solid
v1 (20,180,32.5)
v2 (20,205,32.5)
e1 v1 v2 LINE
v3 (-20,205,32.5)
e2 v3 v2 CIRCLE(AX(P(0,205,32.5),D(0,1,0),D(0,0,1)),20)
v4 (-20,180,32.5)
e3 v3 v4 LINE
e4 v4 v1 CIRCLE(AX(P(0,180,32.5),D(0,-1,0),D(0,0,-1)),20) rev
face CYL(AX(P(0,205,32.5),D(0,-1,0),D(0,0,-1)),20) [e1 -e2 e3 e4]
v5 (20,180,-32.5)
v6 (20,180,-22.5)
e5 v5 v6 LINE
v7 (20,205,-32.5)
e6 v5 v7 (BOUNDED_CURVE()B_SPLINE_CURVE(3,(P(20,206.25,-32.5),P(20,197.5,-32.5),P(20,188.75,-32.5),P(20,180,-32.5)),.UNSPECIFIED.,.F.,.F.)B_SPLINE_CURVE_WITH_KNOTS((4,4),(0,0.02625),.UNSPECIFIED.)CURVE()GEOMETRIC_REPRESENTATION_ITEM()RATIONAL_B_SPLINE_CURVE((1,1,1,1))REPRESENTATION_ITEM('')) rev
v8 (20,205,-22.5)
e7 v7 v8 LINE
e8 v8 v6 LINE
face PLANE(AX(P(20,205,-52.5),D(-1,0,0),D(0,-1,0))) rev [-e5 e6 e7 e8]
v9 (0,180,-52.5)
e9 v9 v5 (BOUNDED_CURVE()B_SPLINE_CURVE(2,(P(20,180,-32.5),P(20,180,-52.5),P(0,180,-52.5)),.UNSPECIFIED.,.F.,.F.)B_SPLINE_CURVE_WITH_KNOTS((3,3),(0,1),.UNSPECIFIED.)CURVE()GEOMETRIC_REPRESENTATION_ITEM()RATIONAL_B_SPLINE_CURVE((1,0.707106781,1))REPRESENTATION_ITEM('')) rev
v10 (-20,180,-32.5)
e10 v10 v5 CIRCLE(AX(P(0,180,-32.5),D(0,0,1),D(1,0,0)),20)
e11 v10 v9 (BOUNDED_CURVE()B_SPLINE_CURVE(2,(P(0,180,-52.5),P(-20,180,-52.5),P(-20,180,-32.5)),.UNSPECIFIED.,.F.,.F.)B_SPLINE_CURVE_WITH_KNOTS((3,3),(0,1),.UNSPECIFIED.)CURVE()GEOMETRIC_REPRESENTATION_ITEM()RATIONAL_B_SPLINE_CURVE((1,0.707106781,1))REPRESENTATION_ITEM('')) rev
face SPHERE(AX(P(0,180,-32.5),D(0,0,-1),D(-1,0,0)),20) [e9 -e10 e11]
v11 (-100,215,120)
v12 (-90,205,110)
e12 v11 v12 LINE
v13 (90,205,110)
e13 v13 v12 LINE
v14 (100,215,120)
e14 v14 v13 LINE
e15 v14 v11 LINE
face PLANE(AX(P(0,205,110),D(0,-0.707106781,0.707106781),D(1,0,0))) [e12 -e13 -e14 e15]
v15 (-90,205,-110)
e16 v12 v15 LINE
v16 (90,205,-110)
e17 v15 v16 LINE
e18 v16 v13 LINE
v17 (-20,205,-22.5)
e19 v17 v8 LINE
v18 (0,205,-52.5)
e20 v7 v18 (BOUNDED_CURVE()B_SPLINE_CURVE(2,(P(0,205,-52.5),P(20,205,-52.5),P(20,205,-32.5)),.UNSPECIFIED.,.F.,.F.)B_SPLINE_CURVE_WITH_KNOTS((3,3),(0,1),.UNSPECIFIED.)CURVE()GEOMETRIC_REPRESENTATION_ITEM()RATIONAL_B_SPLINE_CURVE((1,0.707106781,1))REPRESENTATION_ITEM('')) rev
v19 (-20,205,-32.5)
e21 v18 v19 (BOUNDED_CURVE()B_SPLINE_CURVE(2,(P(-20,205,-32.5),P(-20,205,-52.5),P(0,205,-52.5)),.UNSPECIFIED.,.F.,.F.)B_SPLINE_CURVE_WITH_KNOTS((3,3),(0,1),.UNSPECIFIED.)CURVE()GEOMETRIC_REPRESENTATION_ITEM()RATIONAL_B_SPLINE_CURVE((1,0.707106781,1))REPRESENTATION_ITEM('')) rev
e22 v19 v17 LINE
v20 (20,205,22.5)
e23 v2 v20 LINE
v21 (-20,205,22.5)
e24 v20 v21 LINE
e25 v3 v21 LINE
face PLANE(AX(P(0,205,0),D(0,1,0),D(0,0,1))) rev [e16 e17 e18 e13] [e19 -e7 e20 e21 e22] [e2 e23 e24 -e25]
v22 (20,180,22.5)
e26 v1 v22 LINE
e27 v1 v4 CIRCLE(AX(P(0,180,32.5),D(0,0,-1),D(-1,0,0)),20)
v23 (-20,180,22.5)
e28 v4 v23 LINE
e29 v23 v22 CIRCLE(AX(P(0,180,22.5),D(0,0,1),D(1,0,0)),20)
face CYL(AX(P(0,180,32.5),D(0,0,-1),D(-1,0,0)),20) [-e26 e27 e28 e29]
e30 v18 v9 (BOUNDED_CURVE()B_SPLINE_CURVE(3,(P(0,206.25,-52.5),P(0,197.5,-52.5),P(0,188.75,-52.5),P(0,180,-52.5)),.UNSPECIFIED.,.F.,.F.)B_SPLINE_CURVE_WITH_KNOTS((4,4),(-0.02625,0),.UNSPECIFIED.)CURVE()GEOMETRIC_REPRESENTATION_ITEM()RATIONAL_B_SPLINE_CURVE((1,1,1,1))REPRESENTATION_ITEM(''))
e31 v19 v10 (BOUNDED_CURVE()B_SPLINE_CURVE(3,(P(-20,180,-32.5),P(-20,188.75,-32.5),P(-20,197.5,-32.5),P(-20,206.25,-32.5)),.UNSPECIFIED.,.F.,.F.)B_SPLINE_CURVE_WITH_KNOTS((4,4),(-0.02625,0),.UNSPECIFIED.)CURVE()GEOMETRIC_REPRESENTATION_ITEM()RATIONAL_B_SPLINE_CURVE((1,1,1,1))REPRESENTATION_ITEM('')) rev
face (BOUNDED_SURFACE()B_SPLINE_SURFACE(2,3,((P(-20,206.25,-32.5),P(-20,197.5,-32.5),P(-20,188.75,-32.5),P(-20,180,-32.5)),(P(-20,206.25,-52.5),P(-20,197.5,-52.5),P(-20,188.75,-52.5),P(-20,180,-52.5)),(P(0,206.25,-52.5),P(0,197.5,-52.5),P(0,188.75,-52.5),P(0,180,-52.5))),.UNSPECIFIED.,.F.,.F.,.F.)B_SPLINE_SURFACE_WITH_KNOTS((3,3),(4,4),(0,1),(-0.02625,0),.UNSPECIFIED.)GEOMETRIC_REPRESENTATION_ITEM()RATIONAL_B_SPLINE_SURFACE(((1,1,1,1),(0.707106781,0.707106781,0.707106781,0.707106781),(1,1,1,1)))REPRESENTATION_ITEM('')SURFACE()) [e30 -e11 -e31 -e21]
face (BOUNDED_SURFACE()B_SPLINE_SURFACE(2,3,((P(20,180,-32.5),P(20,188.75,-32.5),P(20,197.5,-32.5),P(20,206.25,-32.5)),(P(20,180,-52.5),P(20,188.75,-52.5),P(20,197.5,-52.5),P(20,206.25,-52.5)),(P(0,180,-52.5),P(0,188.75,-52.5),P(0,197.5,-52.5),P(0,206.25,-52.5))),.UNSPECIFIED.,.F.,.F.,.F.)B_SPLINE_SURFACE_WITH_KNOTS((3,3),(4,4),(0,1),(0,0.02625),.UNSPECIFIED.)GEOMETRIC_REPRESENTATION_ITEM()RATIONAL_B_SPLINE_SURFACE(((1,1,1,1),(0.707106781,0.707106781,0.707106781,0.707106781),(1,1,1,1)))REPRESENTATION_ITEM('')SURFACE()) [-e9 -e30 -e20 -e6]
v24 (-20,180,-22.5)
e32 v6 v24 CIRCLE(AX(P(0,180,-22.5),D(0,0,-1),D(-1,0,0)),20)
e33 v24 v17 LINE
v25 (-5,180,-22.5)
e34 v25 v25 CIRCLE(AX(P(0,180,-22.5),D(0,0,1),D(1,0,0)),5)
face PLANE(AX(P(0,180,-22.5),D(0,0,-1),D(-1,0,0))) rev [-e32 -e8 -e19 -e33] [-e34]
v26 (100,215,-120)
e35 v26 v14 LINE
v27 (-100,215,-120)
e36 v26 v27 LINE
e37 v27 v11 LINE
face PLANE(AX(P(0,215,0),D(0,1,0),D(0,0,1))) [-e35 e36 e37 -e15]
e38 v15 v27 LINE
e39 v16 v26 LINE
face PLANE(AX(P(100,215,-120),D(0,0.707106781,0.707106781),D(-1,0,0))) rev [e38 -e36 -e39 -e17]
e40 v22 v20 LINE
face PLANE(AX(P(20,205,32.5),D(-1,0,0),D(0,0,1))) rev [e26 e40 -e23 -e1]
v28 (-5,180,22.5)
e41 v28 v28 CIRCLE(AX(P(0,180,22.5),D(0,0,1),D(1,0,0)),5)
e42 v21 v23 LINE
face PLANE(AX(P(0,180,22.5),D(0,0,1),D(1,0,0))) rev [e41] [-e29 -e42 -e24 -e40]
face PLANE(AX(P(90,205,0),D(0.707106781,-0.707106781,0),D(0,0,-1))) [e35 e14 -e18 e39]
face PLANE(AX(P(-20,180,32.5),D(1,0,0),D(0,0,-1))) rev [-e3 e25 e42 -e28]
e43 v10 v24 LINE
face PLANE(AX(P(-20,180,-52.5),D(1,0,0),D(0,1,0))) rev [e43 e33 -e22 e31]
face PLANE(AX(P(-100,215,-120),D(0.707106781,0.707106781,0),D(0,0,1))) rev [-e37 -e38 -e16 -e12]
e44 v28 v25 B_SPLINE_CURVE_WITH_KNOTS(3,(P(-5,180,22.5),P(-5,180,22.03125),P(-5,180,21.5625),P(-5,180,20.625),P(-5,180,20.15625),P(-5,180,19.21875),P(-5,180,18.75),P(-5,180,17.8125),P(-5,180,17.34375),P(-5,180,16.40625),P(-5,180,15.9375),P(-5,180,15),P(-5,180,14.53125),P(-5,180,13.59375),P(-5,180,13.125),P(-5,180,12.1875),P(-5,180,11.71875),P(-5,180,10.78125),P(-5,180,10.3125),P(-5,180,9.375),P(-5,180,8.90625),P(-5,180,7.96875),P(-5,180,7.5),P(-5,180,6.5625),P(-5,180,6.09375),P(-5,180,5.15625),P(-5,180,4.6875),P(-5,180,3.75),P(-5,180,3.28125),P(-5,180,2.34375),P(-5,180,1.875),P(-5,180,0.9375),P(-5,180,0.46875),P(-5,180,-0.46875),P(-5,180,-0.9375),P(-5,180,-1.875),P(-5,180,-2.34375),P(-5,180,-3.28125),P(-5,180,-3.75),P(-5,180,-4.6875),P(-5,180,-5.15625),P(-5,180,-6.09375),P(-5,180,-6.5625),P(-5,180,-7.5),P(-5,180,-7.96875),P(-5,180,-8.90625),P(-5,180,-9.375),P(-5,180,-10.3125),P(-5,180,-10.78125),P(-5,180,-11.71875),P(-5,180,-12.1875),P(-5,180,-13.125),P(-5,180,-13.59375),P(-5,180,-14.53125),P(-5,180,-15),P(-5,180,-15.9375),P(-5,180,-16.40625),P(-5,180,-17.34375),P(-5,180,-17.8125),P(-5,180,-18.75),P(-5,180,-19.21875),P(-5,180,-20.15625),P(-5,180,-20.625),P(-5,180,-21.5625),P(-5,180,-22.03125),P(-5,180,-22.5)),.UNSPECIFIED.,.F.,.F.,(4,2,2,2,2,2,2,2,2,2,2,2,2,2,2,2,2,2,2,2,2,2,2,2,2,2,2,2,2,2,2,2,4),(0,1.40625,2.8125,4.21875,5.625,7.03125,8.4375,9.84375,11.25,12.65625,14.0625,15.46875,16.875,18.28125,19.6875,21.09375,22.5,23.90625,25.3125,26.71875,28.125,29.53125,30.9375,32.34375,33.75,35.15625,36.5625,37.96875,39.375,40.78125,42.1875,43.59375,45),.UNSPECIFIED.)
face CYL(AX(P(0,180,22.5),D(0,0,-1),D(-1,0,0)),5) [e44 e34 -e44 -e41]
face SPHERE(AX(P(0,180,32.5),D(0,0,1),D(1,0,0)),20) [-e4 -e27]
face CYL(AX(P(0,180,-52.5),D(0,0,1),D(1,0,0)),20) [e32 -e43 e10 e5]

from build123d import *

# Parameters (mm, degrees)
SKETCH1_R           = 5
BOSS_EXTRUDE1_DEPTH = 22.5
BOSS_EXTRUDE4_DEPTH = 10
BOSS_EXTRUDE5_DEPTH = 20
FILLET1_SIZE        = 20
BOSS_EXTRUDE6_DEPTH = 25
BOSS_EXTRUDE7_START = 30
BOSS_EXTRUDE7_DEPTH = 30
FILLET3_SIZE        = 20
SKETCH8_W           = 200
SKETCH8_H           = 240
BOSS_EXTRUDE8_DEPTH = 10
CHAMFER1_SIZE       = 10


# Some blends are built 0.0001 mm under size
with BuildPart() as part:
    # Sketch1 → Boss-Extrude1 (new, symmetric)
    with BuildSketch(Plane.XY):
        with Locations(Location((0, 180, 0), (0, 0, 180))):
            Circle(SKETCH1_R)
    extrude(amount=BOSS_EXTRUDE1_DEPTH, both=True)

    # Sketch4 → Boss-Extrude4 (add)
    with BuildSketch(Plane.XY.offset(22.5)):
        with BuildLine():
            Line((-20, 180), (-20, 205))
            Line((-20, 205), (20, 205))
            Line((20, 205), (20, 180))
            ThreePointArc((20, 180), (0, 160), (-20, 180))
        make_face()
    extrude(amount=BOSS_EXTRUDE4_DEPTH)

    # Sketch5 → Boss-Extrude5 (add)
    with BuildSketch(Plane.XY.offset(32.5)):
        with BuildLine():
            Line((-20, 180), (20, 180))
            ThreePointArc((20, 180), (0, 160), (-20, 180))
        make_face()
    extrude(amount=BOSS_EXTRUDE5_DEPTH)

    # Fillet1
    # a fillet whose section is not a circle: 20 mm, written as the material it takes off along each edge
    with BuildSketch(Plane(origin=(0, 180, 52.5), x_dir=(0.003141587485879206, 0.9999950652018581, 0), z_dir=(-0.9999950652018581, 0.003141587485879206, 0))) as fillet1_piece_1:
        with BuildLine():
            Bezier((20, FILLET1_SIZE), (20, 0), (20 - FILLET1_SIZE, 0), weights=[1, 0.707106781, 1])
            Line((20 - FILLET1_SIZE, 0), (20, 0))
            Line((20, 0), (20, FILLET1_SIZE))
        make_face()
    revolve(axis=Axis((0, 180, 52.5), (0, 0, -1)), revolution_arc=359.64, mode=Mode.SUBTRACT)

    # Sketch6 → Boss-Extrude6 (add)
    with BuildSketch(Plane(origin=(0, 180, 0), x_dir=(1, 0, 0), z_dir=(0, 1, 0))):
        with BuildLine():
            Line((20, -32.5), (-20, -32.5))
            ThreePointArc((-20, -32.5), (0, -52.5), (20, -32.5))
        make_face()
    extrude(amount=BOSS_EXTRUDE6_DEPTH)

    # Sketch7 → Boss-Extrude7 (add)
    with BuildSketch(Plane(origin=(0, 0, -22.5), x_dir=(-1, 0, 0), z_dir=(0, 0, -1)).offset(BOSS_EXTRUDE7_START)):
        with BuildLine():
            Line((20, 180), (20, 205))
            Line((20, 205), (-20, 205))
            Line((-20, 205), (-20, 180))
            ThreePointArc((-20, 180), (0, 160), (20, 180))
        make_face()
    extrude(amount=-BOSS_EXTRUDE7_DEPTH)

    # Fillet3
    # a fillet whose section is not a circle: 20 mm, written as the material it takes off along each edge
    with BuildSketch(Plane(origin=(0, 180, -52.5), x_dir=(1, 0, 0), z_dir=(0, 1, 0))) as fillet3_piece_1:
        with BuildLine():
            Bezier((20, -FILLET3_SIZE), (20, 0), (20 - FILLET3_SIZE, 0), weights=[1, 0.707106781, 1])
            Line((20 - FILLET3_SIZE, 0), (20, 0))
            Line((20, 0), (20, -FILLET3_SIZE))
        make_face()
    revolve(axis=Axis((0, 180, -52.5), (0, 0, -1)), revolution_arc=180, mode=Mode.SUBTRACT)
    with BuildSketch(Plane(origin=(20, 255, -52.5), x_dir=(-1, 0, 0), z_dir=(0, -1, 0))) as fillet3_piece_2:
        with BuildLine():
            Bezier((FILLET3_SIZE, 0), (0, 0), (0, -FILLET3_SIZE), weights=[1, 0.707106781, 1])
            Line((0, -FILLET3_SIZE), (0, 0))
            Line((0, 0), (FILLET3_SIZE, 0))
        make_face()
    extrude(amount=75, mode=Mode.SUBTRACT)
    with BuildSketch(Plane(origin=(-20, 180, -52.5), x_dir=(0, 0, 1), z_dir=(0, 1, 0))) as fillet3_piece_3:
        with BuildLine():
            Bezier((FILLET3_SIZE, 0), (0, 0), (0, FILLET3_SIZE), weights=[1, 0.707106781, 1])
            Line((0, FILLET3_SIZE), (0, 0))
            Line((0, 0), (FILLET3_SIZE, 0))
        make_face()
    extrude(amount=75, mode=Mode.SUBTRACT)

    # Sketch8 → Boss-Extrude8 (add)
    with BuildSketch(Plane(origin=(0, 205, 0), x_dir=(1, 0, 0), z_dir=(0, 1, 0))):
        Rectangle(SKETCH8_W, SKETCH8_H)
    extrude(amount=BOSS_EXTRUDE8_DEPTH)

    # Chamfer1
    chamfer1_edges = [part.edges().sort_by_distance(p)[0] for p in [
        (100, 205, 0),
        (0, 205, -120),
        (-100, 205, 0),
        (0, 205, 120),
    ]]
    chamfer(chamfer1_edges, length=CHAMFER1_SIZE - 0.0001)  # a hair under: the kernel refuses the full size


solid = part.part
